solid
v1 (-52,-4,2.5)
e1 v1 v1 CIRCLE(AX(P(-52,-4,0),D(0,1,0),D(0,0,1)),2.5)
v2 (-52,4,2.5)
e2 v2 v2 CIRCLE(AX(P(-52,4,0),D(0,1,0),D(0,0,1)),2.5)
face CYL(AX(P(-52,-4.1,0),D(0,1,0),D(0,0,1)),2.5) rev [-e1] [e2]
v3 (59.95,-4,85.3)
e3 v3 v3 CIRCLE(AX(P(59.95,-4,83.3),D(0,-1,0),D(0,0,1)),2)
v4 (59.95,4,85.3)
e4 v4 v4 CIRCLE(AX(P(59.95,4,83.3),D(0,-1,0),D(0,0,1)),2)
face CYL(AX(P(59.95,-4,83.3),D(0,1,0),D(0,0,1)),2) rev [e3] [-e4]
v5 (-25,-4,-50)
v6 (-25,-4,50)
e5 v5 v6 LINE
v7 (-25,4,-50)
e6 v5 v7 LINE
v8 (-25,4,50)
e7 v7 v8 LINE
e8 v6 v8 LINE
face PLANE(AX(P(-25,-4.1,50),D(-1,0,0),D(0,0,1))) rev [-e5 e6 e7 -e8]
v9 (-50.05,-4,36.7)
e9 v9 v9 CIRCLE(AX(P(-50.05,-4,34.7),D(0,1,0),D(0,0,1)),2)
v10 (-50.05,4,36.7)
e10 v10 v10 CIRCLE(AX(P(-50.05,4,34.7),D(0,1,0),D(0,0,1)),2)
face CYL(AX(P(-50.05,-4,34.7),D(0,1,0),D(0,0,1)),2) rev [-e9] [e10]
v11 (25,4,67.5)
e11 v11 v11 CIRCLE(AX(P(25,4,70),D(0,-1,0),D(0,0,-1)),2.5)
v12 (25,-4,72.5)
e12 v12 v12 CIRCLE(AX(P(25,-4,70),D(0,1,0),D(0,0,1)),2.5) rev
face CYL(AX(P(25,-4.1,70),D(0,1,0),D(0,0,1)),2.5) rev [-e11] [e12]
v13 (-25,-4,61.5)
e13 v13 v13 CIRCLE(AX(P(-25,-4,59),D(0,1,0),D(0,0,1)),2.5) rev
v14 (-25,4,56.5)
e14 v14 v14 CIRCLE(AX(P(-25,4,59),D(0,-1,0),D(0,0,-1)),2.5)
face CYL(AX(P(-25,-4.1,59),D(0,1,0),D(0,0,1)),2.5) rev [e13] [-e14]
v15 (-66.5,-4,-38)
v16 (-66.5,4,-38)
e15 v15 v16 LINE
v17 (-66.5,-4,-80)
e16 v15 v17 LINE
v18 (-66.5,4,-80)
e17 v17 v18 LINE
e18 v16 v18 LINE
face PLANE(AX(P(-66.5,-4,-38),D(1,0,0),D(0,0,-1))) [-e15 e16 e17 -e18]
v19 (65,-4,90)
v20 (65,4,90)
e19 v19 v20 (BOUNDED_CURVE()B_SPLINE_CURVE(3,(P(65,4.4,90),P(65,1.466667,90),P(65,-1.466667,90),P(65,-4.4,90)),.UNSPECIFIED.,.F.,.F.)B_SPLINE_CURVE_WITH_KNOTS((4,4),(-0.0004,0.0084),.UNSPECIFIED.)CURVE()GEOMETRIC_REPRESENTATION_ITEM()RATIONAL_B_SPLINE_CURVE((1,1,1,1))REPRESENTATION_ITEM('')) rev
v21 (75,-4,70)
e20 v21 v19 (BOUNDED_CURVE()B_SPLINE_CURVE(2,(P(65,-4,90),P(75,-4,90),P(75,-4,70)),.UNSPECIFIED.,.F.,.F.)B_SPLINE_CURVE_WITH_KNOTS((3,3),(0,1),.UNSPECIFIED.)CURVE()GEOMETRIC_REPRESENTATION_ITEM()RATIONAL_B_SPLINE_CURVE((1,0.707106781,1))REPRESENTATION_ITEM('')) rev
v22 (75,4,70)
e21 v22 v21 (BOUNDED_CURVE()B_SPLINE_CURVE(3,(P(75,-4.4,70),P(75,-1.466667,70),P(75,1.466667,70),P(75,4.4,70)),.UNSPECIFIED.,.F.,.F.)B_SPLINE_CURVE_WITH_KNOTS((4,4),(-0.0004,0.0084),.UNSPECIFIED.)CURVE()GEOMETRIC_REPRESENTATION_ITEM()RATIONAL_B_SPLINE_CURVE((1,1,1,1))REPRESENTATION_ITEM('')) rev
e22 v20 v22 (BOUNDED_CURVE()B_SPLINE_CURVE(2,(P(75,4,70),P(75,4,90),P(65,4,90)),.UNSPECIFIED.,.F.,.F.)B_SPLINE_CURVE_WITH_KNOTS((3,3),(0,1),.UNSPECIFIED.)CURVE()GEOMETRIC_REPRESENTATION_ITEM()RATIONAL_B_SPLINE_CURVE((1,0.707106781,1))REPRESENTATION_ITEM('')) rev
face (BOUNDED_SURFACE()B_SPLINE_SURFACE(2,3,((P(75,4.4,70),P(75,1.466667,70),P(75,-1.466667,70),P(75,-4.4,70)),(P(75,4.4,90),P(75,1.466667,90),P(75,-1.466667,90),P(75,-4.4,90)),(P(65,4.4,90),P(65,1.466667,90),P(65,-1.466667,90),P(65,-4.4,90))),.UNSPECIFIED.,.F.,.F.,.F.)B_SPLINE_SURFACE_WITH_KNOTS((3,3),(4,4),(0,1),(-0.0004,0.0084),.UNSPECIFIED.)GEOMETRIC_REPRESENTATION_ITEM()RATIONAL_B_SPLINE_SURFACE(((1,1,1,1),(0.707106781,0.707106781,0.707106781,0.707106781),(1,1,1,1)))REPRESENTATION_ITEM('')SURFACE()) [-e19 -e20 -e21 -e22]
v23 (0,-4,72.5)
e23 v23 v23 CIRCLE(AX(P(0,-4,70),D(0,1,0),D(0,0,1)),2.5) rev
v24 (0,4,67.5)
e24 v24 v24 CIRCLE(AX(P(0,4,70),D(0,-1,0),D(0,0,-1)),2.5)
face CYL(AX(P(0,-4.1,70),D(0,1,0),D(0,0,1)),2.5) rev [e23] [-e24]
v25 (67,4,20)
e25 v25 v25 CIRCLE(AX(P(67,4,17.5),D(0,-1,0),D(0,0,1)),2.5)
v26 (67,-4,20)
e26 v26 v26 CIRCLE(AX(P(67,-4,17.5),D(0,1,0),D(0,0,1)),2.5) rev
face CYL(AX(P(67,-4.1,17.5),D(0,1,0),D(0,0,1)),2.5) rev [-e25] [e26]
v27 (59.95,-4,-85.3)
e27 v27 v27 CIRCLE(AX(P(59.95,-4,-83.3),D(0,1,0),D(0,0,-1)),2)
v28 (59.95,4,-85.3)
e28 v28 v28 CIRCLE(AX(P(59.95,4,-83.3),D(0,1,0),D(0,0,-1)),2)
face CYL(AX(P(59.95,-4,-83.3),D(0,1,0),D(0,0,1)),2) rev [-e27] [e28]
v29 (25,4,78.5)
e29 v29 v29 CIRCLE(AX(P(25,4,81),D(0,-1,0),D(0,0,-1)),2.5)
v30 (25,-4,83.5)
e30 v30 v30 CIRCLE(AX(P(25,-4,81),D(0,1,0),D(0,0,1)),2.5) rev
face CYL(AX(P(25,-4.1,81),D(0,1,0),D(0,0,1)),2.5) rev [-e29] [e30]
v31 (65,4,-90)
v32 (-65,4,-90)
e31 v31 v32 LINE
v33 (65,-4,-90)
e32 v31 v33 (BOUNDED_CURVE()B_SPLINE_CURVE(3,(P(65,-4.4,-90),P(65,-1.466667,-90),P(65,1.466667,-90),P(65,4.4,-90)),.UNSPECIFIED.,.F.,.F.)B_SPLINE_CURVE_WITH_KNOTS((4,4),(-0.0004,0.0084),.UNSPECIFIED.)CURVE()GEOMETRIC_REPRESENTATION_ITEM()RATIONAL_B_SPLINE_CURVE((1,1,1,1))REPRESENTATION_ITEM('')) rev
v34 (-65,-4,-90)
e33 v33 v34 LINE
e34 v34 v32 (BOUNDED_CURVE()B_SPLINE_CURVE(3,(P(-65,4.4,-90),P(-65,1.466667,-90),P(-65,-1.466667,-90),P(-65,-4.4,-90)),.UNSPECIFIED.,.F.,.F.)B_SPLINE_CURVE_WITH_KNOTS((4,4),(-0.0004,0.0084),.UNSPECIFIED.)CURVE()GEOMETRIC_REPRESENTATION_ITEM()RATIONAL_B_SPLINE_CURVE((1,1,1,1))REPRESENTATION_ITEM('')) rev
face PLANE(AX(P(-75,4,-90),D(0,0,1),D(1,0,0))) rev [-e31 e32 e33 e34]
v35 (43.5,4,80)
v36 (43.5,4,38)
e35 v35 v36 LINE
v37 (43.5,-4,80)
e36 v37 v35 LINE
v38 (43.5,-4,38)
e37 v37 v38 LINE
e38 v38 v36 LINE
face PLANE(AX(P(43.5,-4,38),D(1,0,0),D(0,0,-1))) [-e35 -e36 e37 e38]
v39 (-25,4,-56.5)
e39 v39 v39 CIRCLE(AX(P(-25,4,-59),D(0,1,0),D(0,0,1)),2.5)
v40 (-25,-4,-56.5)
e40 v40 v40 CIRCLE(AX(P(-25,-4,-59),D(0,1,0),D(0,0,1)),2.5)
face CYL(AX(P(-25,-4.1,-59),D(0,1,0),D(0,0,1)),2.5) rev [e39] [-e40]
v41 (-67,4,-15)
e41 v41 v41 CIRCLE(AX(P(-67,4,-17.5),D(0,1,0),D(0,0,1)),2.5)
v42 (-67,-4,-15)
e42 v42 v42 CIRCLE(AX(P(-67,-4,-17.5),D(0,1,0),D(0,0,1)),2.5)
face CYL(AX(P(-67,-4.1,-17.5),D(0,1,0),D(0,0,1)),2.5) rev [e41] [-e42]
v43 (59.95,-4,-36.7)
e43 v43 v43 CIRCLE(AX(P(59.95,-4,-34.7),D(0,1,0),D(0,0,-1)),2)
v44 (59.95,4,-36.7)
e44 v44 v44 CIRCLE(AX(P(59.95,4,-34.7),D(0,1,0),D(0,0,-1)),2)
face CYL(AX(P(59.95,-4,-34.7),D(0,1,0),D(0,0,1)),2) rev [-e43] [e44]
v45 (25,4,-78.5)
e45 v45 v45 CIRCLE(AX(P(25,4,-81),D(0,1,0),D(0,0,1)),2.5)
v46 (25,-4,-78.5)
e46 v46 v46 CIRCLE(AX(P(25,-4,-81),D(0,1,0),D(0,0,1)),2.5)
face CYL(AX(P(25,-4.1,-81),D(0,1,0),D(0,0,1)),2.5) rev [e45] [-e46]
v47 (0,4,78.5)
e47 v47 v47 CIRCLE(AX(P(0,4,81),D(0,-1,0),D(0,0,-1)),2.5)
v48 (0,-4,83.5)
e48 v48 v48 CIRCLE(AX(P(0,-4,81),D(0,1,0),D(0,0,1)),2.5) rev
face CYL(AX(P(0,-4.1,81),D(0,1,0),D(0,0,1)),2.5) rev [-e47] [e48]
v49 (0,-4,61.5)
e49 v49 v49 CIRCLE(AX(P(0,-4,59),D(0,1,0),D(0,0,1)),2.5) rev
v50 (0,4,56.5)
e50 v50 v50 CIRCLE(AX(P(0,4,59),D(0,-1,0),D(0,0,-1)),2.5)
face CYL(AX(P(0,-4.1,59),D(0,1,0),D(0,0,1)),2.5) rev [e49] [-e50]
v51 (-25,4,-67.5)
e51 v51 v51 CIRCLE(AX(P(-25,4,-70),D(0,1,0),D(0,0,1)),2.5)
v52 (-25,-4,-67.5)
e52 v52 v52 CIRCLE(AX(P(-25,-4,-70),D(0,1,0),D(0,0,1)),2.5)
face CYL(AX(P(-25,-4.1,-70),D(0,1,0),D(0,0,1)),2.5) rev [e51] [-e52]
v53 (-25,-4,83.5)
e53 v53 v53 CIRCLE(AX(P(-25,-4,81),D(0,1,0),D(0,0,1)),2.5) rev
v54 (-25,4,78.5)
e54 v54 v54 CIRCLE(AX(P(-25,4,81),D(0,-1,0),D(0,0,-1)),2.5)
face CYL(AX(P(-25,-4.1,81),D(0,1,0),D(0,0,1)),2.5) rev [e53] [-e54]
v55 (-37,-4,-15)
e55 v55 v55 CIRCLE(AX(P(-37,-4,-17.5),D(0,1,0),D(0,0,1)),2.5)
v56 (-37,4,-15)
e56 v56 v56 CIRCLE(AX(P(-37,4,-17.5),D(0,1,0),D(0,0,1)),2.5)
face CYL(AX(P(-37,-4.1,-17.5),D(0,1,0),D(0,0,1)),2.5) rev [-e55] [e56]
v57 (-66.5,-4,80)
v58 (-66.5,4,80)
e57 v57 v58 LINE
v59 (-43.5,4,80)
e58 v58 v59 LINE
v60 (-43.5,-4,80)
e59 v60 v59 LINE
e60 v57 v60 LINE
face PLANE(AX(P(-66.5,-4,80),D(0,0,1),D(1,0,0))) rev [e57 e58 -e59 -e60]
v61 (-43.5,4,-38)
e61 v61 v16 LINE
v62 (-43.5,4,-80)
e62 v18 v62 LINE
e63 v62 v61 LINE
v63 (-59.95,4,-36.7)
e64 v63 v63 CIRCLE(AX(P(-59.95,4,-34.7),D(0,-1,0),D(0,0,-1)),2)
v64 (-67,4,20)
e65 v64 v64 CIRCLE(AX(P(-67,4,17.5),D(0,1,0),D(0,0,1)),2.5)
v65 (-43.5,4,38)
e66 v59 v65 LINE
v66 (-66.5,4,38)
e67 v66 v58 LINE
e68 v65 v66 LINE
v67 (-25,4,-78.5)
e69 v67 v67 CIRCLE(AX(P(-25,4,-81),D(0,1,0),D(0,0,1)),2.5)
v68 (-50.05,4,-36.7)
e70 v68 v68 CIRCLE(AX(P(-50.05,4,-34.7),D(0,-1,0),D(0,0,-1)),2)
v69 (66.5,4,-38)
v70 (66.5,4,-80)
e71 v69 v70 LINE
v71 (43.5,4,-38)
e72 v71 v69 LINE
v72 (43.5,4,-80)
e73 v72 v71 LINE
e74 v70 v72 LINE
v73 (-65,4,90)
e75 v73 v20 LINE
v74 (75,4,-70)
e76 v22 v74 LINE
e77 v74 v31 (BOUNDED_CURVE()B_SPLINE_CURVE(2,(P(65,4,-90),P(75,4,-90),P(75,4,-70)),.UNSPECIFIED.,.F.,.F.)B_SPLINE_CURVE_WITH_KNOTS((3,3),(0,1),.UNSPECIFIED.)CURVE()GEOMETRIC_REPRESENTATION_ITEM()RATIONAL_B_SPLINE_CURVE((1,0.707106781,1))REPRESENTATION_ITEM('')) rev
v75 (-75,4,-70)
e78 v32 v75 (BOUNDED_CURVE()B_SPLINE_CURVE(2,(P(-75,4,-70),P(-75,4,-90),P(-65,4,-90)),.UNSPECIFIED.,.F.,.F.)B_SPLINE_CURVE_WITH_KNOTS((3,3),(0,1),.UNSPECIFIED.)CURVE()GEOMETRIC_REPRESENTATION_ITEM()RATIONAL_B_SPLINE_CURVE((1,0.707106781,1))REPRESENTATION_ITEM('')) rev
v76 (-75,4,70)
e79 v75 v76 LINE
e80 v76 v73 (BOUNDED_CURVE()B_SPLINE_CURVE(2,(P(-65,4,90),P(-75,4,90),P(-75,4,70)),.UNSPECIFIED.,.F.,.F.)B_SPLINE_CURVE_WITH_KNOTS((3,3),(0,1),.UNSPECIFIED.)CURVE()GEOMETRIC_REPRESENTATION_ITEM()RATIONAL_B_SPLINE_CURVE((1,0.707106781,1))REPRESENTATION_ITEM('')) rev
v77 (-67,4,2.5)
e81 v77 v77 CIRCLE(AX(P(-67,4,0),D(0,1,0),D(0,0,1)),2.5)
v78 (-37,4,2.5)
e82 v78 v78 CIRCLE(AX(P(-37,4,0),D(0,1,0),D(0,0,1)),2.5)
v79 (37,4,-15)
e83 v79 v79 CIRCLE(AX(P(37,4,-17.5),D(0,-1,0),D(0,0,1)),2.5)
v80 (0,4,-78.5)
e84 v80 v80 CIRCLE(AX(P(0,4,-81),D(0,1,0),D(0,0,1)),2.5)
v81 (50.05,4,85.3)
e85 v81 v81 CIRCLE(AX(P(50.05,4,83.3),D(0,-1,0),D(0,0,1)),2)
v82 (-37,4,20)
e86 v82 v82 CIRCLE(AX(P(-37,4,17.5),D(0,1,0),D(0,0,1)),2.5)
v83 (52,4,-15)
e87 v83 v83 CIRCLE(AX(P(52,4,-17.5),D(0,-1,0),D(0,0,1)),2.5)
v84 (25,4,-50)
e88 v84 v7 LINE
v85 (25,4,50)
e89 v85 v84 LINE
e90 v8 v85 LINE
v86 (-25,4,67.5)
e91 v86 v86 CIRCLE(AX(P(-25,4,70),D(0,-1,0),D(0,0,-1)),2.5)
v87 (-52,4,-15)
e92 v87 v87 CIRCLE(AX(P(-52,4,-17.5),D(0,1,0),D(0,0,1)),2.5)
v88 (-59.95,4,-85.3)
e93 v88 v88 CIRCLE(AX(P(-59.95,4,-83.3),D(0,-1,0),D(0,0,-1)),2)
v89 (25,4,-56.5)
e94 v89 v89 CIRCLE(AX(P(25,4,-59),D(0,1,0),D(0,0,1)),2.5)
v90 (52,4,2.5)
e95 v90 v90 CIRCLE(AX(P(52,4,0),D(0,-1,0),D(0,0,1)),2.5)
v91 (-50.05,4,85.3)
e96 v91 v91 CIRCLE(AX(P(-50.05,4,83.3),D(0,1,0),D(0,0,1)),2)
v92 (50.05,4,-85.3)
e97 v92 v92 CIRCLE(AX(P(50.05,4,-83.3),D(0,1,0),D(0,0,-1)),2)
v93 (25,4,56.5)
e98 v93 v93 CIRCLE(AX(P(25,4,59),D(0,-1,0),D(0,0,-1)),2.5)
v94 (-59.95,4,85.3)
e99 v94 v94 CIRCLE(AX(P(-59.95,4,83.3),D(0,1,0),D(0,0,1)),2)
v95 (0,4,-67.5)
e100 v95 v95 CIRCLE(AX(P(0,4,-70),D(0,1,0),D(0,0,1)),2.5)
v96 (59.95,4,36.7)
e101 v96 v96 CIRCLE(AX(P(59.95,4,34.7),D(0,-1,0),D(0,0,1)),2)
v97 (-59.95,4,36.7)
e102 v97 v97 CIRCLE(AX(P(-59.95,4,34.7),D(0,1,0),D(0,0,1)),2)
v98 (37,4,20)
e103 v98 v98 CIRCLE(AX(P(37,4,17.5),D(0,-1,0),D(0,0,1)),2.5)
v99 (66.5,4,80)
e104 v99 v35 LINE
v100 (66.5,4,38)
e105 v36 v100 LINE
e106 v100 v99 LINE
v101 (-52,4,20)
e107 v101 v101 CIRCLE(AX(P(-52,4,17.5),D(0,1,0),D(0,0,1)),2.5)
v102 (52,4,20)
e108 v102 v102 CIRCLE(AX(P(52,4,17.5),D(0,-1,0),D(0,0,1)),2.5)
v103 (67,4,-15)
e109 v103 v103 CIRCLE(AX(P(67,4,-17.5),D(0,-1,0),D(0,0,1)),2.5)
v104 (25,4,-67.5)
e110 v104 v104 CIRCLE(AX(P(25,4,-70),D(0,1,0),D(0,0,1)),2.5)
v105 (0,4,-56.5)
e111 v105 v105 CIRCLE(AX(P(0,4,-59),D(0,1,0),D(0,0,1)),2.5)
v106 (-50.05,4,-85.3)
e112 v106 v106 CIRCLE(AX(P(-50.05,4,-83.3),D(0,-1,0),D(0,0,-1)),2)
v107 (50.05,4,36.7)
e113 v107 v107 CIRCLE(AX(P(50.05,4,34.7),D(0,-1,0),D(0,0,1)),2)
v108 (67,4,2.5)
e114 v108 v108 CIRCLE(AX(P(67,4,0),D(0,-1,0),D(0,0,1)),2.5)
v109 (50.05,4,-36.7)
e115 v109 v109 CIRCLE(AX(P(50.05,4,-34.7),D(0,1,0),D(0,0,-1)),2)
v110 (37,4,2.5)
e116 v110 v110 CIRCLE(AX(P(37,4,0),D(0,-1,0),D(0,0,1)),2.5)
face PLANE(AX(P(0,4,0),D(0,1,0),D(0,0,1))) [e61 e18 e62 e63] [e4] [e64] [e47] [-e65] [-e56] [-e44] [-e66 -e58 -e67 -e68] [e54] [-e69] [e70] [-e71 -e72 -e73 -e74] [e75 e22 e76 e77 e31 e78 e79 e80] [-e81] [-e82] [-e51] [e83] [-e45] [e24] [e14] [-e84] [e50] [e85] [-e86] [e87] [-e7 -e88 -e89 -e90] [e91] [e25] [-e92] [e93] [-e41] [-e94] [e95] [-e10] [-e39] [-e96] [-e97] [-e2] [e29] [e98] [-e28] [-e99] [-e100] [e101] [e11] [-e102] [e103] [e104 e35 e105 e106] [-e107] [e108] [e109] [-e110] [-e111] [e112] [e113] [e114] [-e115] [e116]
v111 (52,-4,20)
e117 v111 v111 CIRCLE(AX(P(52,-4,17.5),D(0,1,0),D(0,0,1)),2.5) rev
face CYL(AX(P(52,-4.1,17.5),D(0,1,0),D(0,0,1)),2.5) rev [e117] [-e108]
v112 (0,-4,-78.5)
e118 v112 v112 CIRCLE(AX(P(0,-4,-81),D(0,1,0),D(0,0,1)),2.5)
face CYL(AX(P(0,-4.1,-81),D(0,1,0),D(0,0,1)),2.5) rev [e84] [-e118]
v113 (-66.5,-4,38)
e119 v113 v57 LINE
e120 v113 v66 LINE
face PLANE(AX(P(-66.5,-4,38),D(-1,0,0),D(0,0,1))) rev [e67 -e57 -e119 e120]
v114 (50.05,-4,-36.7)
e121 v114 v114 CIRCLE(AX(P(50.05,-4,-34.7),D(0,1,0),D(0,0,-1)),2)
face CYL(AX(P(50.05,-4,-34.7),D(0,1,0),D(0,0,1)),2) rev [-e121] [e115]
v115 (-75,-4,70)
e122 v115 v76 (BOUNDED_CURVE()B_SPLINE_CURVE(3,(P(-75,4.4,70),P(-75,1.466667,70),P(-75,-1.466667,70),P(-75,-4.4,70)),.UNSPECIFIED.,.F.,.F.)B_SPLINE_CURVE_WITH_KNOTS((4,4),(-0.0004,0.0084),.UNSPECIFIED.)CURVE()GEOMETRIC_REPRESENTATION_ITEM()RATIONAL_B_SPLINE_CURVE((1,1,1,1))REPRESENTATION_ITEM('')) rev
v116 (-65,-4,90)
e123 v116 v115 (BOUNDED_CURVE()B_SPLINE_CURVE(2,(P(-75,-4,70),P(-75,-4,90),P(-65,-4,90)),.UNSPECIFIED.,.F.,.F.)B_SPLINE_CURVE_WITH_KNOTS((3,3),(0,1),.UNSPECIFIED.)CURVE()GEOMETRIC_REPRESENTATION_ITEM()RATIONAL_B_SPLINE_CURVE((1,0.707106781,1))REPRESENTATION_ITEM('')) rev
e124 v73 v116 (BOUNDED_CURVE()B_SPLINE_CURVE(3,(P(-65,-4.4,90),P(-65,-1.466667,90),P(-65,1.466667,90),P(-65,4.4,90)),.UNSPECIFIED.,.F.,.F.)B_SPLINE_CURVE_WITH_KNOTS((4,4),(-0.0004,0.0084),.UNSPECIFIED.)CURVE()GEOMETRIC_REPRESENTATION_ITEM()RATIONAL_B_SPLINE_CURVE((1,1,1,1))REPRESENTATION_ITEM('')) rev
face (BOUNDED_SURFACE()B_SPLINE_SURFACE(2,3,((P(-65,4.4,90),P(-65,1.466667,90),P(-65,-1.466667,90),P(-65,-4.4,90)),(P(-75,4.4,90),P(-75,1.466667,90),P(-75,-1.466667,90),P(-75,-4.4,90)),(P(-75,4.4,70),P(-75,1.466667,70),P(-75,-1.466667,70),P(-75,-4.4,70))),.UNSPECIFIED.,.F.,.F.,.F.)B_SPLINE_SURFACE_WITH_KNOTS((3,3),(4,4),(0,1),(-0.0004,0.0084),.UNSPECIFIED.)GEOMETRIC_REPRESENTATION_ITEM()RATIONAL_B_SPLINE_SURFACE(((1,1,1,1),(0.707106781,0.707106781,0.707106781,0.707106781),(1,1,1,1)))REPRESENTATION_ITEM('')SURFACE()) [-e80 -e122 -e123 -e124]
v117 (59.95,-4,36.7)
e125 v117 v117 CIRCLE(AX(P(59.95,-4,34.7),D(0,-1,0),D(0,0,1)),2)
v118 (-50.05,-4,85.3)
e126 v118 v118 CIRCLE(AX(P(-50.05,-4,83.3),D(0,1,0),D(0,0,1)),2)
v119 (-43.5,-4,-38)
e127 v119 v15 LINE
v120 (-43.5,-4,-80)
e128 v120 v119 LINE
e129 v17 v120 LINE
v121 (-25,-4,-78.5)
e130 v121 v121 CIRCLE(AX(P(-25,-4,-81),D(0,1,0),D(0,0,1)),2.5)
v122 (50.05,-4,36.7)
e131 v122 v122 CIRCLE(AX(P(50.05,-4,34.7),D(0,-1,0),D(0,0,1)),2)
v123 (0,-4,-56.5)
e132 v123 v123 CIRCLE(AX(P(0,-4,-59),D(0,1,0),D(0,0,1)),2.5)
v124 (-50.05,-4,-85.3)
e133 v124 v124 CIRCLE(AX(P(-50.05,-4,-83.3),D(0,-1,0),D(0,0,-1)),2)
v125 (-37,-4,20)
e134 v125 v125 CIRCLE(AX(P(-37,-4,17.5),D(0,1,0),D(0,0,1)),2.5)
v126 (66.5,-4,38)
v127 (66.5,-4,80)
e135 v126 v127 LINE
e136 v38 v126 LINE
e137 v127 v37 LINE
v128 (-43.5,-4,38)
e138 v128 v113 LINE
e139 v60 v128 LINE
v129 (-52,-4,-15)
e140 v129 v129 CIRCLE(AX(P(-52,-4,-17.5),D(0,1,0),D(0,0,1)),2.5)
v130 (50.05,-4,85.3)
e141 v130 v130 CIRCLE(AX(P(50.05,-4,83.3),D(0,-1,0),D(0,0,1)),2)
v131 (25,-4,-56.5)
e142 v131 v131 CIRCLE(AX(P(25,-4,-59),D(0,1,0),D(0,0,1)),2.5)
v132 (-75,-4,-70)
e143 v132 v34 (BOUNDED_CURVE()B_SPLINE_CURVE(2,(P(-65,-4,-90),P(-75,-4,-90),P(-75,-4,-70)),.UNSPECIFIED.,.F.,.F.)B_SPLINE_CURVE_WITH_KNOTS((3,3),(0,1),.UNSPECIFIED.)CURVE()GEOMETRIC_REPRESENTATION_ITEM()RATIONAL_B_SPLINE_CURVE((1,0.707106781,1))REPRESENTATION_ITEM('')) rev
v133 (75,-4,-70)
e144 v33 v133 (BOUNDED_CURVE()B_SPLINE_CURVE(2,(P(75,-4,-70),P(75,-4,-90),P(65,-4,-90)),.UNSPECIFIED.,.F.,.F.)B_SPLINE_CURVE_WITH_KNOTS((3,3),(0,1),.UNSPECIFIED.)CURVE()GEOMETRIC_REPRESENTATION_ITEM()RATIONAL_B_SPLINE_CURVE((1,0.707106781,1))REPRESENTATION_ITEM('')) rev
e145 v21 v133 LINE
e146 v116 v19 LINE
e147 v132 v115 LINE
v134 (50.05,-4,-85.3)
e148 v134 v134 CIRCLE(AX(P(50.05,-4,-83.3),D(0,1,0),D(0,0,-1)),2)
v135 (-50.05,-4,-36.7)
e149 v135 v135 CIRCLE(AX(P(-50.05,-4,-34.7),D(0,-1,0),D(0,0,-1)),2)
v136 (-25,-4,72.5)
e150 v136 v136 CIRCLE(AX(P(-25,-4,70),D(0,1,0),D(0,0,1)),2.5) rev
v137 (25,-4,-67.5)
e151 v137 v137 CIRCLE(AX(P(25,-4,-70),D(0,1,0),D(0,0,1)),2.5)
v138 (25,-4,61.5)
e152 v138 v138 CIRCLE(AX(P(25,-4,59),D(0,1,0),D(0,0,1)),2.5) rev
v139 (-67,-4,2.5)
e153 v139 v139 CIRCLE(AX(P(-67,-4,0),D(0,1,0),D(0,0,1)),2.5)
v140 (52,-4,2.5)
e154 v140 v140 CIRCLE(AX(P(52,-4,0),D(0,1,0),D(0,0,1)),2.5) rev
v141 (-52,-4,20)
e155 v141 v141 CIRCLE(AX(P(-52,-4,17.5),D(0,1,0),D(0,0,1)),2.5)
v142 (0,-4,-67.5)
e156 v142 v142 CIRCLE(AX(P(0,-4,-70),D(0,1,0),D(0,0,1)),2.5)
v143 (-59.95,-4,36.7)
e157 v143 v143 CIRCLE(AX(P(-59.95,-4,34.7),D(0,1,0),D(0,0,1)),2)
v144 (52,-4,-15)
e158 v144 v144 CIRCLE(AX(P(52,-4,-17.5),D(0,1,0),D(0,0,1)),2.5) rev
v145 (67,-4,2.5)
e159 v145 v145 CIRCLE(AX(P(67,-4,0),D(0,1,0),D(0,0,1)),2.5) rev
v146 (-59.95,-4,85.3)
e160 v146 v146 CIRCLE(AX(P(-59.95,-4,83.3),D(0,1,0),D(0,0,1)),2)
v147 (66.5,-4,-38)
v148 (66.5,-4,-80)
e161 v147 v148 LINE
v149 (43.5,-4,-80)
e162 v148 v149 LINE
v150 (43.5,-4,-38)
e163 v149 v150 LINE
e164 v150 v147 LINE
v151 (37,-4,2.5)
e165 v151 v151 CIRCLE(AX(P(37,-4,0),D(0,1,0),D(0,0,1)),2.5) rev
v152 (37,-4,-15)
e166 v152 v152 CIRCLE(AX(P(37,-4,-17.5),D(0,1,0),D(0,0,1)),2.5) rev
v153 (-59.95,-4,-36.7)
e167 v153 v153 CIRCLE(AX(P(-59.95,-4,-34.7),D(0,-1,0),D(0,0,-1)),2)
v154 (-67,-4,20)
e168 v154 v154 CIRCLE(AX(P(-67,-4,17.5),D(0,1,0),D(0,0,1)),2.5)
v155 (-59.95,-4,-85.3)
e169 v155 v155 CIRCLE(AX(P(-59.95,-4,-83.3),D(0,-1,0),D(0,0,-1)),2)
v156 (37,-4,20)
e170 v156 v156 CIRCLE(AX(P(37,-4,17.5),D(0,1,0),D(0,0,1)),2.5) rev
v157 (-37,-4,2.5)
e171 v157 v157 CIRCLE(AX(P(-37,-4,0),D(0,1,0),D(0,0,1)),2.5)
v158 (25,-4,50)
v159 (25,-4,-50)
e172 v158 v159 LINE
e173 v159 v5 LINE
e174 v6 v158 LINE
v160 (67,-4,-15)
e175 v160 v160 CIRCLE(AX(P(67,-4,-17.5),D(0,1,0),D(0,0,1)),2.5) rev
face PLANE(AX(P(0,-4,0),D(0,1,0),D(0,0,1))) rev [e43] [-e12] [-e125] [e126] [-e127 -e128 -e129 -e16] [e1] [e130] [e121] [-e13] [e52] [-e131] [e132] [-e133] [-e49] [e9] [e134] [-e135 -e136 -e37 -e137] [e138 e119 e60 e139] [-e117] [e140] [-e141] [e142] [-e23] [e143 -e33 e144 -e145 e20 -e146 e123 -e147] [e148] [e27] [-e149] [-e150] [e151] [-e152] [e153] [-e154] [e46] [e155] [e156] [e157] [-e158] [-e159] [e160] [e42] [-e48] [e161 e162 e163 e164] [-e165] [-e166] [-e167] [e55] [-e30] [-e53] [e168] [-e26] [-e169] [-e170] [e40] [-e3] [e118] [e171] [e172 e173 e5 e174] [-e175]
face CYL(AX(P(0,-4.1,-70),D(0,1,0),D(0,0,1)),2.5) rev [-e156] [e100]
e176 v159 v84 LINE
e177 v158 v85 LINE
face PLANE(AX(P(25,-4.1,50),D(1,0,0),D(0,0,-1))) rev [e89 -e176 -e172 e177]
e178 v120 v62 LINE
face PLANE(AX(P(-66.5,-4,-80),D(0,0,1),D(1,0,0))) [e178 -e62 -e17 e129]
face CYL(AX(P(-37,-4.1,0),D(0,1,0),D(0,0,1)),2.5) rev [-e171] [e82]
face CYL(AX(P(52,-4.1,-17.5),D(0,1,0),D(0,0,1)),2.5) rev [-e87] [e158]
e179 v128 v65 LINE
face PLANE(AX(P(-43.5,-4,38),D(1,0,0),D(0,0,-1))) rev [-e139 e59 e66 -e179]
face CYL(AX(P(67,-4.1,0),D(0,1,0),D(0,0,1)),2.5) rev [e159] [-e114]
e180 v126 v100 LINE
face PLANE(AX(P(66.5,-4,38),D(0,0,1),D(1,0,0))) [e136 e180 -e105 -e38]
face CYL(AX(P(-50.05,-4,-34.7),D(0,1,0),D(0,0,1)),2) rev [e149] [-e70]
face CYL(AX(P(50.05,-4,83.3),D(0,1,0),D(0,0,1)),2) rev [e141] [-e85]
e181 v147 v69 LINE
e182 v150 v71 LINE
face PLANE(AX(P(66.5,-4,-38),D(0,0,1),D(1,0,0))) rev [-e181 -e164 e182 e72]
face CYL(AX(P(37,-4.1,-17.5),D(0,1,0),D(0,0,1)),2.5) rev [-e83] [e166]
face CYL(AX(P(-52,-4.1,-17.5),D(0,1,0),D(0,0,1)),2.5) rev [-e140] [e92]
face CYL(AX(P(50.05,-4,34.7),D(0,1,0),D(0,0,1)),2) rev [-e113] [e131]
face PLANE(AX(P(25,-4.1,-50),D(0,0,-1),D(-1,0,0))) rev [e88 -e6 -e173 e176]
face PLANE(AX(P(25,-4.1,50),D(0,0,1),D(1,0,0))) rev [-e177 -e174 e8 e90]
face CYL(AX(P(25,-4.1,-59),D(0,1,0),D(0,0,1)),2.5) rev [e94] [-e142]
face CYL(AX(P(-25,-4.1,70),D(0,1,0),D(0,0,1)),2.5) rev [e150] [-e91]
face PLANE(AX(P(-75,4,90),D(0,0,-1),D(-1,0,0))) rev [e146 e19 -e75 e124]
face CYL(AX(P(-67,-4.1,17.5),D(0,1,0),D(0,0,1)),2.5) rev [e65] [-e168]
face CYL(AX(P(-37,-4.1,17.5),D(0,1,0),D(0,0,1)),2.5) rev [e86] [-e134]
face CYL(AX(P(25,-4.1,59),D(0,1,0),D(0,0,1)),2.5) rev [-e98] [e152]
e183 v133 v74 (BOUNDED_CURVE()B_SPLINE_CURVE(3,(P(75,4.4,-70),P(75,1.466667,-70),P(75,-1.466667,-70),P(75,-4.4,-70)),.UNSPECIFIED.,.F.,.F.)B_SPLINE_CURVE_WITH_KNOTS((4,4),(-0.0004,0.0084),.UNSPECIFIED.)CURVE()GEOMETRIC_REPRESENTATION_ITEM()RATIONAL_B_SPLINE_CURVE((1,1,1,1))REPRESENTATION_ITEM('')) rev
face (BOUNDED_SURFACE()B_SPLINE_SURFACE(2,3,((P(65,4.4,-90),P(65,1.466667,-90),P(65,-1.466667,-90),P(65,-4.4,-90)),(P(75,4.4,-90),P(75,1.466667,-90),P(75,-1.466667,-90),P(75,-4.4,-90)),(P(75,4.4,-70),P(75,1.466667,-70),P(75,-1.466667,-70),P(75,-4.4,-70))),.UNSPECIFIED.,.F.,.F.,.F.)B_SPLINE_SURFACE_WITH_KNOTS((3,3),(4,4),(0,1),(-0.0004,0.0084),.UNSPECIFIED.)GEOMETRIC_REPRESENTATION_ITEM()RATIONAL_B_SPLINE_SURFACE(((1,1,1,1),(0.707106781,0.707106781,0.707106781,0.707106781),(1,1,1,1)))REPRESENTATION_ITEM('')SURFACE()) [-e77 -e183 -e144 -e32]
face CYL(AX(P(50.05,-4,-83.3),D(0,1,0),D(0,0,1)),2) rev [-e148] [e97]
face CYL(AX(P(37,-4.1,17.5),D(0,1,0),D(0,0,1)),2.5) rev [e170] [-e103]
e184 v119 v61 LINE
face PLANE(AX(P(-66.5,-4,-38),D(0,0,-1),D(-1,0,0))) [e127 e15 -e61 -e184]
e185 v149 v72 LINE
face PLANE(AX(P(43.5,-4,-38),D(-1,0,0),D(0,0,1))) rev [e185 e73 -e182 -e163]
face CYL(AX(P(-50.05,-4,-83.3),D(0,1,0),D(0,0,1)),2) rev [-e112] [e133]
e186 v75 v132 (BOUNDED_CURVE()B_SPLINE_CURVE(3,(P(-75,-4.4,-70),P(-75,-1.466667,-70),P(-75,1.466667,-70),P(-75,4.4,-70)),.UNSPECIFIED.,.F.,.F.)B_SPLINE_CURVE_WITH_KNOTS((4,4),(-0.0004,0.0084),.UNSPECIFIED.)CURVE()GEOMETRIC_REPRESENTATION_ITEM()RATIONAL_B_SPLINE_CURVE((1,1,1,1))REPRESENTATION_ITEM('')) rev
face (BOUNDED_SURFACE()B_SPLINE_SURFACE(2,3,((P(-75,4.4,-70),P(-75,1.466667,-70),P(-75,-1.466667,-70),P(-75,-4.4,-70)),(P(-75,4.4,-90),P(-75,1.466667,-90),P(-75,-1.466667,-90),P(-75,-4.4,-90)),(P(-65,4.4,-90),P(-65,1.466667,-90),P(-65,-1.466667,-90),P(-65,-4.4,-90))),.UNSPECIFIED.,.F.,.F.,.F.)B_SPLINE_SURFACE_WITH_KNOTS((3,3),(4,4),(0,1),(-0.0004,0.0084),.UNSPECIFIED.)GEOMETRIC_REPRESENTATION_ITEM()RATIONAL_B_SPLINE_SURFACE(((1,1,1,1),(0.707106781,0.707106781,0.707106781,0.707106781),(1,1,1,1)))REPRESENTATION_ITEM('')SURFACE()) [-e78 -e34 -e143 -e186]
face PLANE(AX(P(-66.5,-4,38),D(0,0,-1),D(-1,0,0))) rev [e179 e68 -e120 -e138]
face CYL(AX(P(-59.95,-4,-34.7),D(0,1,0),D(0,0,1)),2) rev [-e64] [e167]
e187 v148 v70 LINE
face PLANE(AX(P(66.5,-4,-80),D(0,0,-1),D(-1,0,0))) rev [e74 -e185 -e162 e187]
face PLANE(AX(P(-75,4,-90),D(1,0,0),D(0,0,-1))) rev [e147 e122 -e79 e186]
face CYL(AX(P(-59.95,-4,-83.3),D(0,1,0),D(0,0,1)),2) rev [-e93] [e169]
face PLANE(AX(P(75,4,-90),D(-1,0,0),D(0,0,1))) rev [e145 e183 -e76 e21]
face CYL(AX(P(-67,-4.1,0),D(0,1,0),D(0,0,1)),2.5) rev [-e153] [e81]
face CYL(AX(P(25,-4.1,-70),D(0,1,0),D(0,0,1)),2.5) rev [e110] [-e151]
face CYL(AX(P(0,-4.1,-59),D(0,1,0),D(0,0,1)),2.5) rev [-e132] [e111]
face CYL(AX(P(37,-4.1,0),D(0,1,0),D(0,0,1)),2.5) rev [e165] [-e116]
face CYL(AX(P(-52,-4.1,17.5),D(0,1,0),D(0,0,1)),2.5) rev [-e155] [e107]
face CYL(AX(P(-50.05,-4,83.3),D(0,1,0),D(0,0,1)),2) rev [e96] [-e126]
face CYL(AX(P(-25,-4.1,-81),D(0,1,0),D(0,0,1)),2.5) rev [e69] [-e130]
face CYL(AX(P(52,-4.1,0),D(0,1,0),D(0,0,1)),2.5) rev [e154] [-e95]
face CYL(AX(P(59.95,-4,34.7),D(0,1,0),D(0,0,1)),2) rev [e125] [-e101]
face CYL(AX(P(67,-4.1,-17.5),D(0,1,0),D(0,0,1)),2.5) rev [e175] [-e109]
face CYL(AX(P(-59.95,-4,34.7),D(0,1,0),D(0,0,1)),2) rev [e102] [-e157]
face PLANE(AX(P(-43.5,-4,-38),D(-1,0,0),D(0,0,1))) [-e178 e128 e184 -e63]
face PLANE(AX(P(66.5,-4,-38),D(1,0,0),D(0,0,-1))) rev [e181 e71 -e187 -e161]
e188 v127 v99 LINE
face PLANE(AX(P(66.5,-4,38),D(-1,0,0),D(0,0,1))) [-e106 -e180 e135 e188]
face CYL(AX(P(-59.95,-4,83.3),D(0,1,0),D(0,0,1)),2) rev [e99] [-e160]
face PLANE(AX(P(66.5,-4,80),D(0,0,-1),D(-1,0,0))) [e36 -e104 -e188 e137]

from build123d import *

# Parameters (mm, degrees)
SKETCH2_W               = 150
SKETCH2_H               = 180
BOSS_EXTRUDE1_DEPTH     = 4
SKETCH3_R               = 2
SKETCH3_W               = 23
SKETCH3_H               = 42
CUT_EXTRUDE1_DEPTH      = 118.426572802
MIRROR2_COPY_1_SKETCH_R = 2
MIRROR2_COPY_1_SKETCH_W = 23
MIRROR2_COPY_1_SKETCH_H = 42
MIRROR2_COPY_1_DEPTH    = 118.426572802
FILLET1_SIZE            = 10
FILLET1_SIZE_2          = 20
FILLET2_SIZE            = 10
FILLET2_SIZE_2          = 20
SKETCH4_W               = 50
SKETCH4_H               = 100
CUT_EXTRUDE2_DEPTH      = 118.426572949
SKETCH5_R               = 2.5
CUT_EXTRUDE3_DEPTH      = 118.426572949
SKETCH6_R               = 2.5
CUT_EXTRUDE4_DEPTH      = 118.426572949


with BuildPart() as part:
    # Sketch2 → Boss-Extrude1 (new, symmetric)
    with BuildSketch(Plane(origin=(0, 0, 0), x_dir=(1, 0, 0), z_dir=(0, 1, 0))):
        Rectangle(SKETCH2_W, SKETCH2_H)
    extrude(amount=BOSS_EXTRUDE1_DEPTH, both=True)

    # Sketch3 → Cut-Extrude1 (cut, through all)
    with BuildSketch(Plane(origin=(0, 4, 0), x_dir=(1, 0, 0), z_dir=(0, 1, 0))):
        with Locations(Location((-59.95, -34.7, 0), (0, 0, 270))):
            Circle(SKETCH3_R)
        with Locations(Location((-50.05, -34.7, 0), (0, 0, 270))):
            Circle(SKETCH3_R)
        with Locations(Location((-59.95, -83.3, 0), (0, 0, 270))):
            Circle(SKETCH3_R)
        with Locations(Location((-50.05, -83.3, 0), (0, 0, 270))):
            Circle(SKETCH3_R)
        with Locations((-55, -59)):
            Rectangle(SKETCH3_W, SKETCH3_H)
    cut_extrude1 = extrude(amount=-CUT_EXTRUDE1_DEPTH, mode=Mode.SUBTRACT)

    # Mirror1: Cut-Extrude1 across plane
    add(cut_extrude1.mirror(Plane.XY), mode=Mode.SUBTRACT)

    # Mirror2: Cut-Extrude1 across plane
    add(cut_extrude1.mirror(Plane(origin=(0, 0, 0), x_dir=(0, 0, 1), z_dir=(1, 0, 0))), mode=Mode.SUBTRACT)

    # Mirror2 copy 1 sketch → Mirror2 copy 1 (cut, through all)
    with BuildSketch(Plane(origin=(0, 4, 0), x_dir=(-1, 0, 0), z_dir=(0, 1, 0))):
        with Locations(Location((-59.95, -34.7, 0), (0, 0, 270))):
            Circle(MIRROR2_COPY_1_SKETCH_R)
        with Locations(Location((-50.05, -34.7, 0), (0, 0, 270))):
            Circle(MIRROR2_COPY_1_SKETCH_R)
        with Locations(Location((-59.95, -83.3, 0), (0, 0, 270))):
            Circle(MIRROR2_COPY_1_SKETCH_R)
        with Locations(Location((-50.05, -83.3, 0), (0, 0, 270))):
            Circle(MIRROR2_COPY_1_SKETCH_R)
        with Locations((-55, -59)):
            Rectangle(MIRROR2_COPY_1_SKETCH_W, MIRROR2_COPY_1_SKETCH_H)
    extrude(amount=-MIRROR2_COPY_1_DEPTH, mode=Mode.SUBTRACT)

    # Fillet1
    # an asymmetric fillet: 20, 10 mm, written as the material it takes off along each edge
    with BuildSketch(Plane(origin=(-75, -54, -90), x_dir=(1, 0, 0), z_dir=(0, 1, 0))) as fillet1_piece_1:
        with BuildLine():
            Bezier((FILLET1_SIZE, 0), (0, 0), (0, -FILLET1_SIZE_2), weights=[1, 0.707106781, 1])
            Line((0, -FILLET1_SIZE_2), (0, 0))
            Line((0, 0), (FILLET1_SIZE, 0))
        make_face()
    extrude(amount=108, mode=Mode.SUBTRACT)
    with BuildSketch(Plane(origin=(75, 54, 90), x_dir=(0, 0, -1), z_dir=(0, -1, 0))) as fillet1_piece_2:
        with BuildLine():
            Bezier((FILLET1_SIZE_2, 0), (0, 0), (0, -FILLET1_SIZE), weights=[1, 0.707106781, 1])
            Line((0, -FILLET1_SIZE), (0, 0))
            Line((0, 0), (FILLET1_SIZE_2, 0))
        make_face()
    extrude(amount=108, mode=Mode.SUBTRACT)

    # Fillet2
    # an asymmetric fillet: 20, 10 mm, written as the material it takes off along each edge
    with BuildSketch(Plane(origin=(75, 54, -90), x_dir=(-1, 0, 0), z_dir=(0, -1, 0))) as fillet2_piece_1:
        with BuildLine():
            Bezier((FILLET2_SIZE, 0), (0, 0), (0, -FILLET2_SIZE_2), weights=[1, 0.707106781, 1])
            Line((0, -FILLET2_SIZE_2), (0, 0))
            Line((0, 0), (FILLET2_SIZE, 0))
        make_face()
    extrude(amount=108, mode=Mode.SUBTRACT)
    with BuildSketch(Plane(origin=(-75, -54, 90), x_dir=(0, 0, -1), z_dir=(0, 1, 0))) as fillet2_piece_2:
        with BuildLine():
            Bezier((FILLET2_SIZE_2, 0), (0, 0), (0, -FILLET2_SIZE), weights=[1, 0.707106781, 1])
            Line((0, -FILLET2_SIZE), (0, 0))
            Line((0, 0), (FILLET2_SIZE_2, 0))
        make_face()
    extrude(amount=108, mode=Mode.SUBTRACT)

    # Sketch4 → Cut-Extrude2 (cut, through all)
    with BuildSketch(Plane(origin=(0, 4, 0), x_dir=(1, 0, 0), z_dir=(0, 1, 0))):
        Rectangle(SKETCH4_W, SKETCH4_H)
    extrude(amount=-CUT_EXTRUDE2_DEPTH, mode=Mode.SUBTRACT)

    # Sketch5 → Cut-Extrude3 (cut, through all)
    with BuildSketch(Plane(origin=(0, 4, 0), x_dir=(1, 0, 0), z_dir=(0, 1, 0))):
        with Locations(Location((-25, 81, 0), (0, 0, 270))):
            Circle(SKETCH5_R)
        with Locations(Location((25, 81, 0), (0, 0, 270))):
            Circle(SKETCH5_R)
        with Locations(Location((0, 81, 0), (0, 0, 270))):
            Circle(SKETCH5_R)
        with Locations(Location((-25, 70, 0), (0, 0, 270))):
            Circle(SKETCH5_R)
        with Locations(Location((0, 70, 0), (0, 0, 270))):
            Circle(SKETCH5_R)
        with Locations(Location((25, 70, 0), (0, 0, 270))):
            Circle(SKETCH5_R)
        with Locations(Location((-25, 59, 0), (0, 0, 270))):
            Circle(SKETCH5_R)
        with Locations(Location((0, 59, 0), (0, 0, 270))):
            Circle(SKETCH5_R)
        with Locations(Location((25, 59, 0), (0, 0, 270))):
            Circle(SKETCH5_R)
    cut_extrude3 = extrude(amount=-CUT_EXTRUDE3_DEPTH, mode=Mode.SUBTRACT)

    # Sketch6 → Cut-Extrude4 (cut, through all)
    with BuildSketch(Plane(origin=(0, 4, 0), x_dir=(1, 0, 0), z_dir=(0, 1, 0))):
        with Locations(Location((-67, 17.5, 0), (0, 0, 270))):
            Circle(SKETCH6_R)
        with Locations(Location((-67, -17.5, 0), (0, 0, 270))):
            Circle(SKETCH6_R)
        with Locations(Location((-67, 0, 0), (0, 0, 270))):
            Circle(SKETCH6_R)
        with Locations(Location((-52, 0, 0), (0, 0, 270))):
            Circle(SKETCH6_R)
        with Locations(Location((-52, 17.5, 0), (0, 0, 270))):
            Circle(SKETCH6_R)
        with Locations(Location((-52, -17.5, 0), (0, 0, 270))):
            Circle(SKETCH6_R)
        with Locations(Location((-37, 0, 0), (0, 0, 270))):
            Circle(SKETCH6_R)
        with Locations(Location((-37, 17.5, 0), (0, 0, 270))):
            Circle(SKETCH6_R)
        with Locations(Location((-37, -17.5, 0), (0, 0, 270))):
            Circle(SKETCH6_R)
    cut_extrude4 = extrude(amount=-CUT_EXTRUDE4_DEPTH, mode=Mode.SUBTRACT)

    # Mirror4: Cut-Extrude4 across plane
    add(cut_extrude4.mirror(Plane(origin=(0, 0, 0), x_dir=(0, 0, 1), z_dir=(1, 0, 0))), mode=Mode.SUBTRACT)

    # Mirror5: Cut-Extrude3 across plane
    add(cut_extrude3.mirror(Plane.XY), mode=Mode.SUBTRACT)


solid = part.part
